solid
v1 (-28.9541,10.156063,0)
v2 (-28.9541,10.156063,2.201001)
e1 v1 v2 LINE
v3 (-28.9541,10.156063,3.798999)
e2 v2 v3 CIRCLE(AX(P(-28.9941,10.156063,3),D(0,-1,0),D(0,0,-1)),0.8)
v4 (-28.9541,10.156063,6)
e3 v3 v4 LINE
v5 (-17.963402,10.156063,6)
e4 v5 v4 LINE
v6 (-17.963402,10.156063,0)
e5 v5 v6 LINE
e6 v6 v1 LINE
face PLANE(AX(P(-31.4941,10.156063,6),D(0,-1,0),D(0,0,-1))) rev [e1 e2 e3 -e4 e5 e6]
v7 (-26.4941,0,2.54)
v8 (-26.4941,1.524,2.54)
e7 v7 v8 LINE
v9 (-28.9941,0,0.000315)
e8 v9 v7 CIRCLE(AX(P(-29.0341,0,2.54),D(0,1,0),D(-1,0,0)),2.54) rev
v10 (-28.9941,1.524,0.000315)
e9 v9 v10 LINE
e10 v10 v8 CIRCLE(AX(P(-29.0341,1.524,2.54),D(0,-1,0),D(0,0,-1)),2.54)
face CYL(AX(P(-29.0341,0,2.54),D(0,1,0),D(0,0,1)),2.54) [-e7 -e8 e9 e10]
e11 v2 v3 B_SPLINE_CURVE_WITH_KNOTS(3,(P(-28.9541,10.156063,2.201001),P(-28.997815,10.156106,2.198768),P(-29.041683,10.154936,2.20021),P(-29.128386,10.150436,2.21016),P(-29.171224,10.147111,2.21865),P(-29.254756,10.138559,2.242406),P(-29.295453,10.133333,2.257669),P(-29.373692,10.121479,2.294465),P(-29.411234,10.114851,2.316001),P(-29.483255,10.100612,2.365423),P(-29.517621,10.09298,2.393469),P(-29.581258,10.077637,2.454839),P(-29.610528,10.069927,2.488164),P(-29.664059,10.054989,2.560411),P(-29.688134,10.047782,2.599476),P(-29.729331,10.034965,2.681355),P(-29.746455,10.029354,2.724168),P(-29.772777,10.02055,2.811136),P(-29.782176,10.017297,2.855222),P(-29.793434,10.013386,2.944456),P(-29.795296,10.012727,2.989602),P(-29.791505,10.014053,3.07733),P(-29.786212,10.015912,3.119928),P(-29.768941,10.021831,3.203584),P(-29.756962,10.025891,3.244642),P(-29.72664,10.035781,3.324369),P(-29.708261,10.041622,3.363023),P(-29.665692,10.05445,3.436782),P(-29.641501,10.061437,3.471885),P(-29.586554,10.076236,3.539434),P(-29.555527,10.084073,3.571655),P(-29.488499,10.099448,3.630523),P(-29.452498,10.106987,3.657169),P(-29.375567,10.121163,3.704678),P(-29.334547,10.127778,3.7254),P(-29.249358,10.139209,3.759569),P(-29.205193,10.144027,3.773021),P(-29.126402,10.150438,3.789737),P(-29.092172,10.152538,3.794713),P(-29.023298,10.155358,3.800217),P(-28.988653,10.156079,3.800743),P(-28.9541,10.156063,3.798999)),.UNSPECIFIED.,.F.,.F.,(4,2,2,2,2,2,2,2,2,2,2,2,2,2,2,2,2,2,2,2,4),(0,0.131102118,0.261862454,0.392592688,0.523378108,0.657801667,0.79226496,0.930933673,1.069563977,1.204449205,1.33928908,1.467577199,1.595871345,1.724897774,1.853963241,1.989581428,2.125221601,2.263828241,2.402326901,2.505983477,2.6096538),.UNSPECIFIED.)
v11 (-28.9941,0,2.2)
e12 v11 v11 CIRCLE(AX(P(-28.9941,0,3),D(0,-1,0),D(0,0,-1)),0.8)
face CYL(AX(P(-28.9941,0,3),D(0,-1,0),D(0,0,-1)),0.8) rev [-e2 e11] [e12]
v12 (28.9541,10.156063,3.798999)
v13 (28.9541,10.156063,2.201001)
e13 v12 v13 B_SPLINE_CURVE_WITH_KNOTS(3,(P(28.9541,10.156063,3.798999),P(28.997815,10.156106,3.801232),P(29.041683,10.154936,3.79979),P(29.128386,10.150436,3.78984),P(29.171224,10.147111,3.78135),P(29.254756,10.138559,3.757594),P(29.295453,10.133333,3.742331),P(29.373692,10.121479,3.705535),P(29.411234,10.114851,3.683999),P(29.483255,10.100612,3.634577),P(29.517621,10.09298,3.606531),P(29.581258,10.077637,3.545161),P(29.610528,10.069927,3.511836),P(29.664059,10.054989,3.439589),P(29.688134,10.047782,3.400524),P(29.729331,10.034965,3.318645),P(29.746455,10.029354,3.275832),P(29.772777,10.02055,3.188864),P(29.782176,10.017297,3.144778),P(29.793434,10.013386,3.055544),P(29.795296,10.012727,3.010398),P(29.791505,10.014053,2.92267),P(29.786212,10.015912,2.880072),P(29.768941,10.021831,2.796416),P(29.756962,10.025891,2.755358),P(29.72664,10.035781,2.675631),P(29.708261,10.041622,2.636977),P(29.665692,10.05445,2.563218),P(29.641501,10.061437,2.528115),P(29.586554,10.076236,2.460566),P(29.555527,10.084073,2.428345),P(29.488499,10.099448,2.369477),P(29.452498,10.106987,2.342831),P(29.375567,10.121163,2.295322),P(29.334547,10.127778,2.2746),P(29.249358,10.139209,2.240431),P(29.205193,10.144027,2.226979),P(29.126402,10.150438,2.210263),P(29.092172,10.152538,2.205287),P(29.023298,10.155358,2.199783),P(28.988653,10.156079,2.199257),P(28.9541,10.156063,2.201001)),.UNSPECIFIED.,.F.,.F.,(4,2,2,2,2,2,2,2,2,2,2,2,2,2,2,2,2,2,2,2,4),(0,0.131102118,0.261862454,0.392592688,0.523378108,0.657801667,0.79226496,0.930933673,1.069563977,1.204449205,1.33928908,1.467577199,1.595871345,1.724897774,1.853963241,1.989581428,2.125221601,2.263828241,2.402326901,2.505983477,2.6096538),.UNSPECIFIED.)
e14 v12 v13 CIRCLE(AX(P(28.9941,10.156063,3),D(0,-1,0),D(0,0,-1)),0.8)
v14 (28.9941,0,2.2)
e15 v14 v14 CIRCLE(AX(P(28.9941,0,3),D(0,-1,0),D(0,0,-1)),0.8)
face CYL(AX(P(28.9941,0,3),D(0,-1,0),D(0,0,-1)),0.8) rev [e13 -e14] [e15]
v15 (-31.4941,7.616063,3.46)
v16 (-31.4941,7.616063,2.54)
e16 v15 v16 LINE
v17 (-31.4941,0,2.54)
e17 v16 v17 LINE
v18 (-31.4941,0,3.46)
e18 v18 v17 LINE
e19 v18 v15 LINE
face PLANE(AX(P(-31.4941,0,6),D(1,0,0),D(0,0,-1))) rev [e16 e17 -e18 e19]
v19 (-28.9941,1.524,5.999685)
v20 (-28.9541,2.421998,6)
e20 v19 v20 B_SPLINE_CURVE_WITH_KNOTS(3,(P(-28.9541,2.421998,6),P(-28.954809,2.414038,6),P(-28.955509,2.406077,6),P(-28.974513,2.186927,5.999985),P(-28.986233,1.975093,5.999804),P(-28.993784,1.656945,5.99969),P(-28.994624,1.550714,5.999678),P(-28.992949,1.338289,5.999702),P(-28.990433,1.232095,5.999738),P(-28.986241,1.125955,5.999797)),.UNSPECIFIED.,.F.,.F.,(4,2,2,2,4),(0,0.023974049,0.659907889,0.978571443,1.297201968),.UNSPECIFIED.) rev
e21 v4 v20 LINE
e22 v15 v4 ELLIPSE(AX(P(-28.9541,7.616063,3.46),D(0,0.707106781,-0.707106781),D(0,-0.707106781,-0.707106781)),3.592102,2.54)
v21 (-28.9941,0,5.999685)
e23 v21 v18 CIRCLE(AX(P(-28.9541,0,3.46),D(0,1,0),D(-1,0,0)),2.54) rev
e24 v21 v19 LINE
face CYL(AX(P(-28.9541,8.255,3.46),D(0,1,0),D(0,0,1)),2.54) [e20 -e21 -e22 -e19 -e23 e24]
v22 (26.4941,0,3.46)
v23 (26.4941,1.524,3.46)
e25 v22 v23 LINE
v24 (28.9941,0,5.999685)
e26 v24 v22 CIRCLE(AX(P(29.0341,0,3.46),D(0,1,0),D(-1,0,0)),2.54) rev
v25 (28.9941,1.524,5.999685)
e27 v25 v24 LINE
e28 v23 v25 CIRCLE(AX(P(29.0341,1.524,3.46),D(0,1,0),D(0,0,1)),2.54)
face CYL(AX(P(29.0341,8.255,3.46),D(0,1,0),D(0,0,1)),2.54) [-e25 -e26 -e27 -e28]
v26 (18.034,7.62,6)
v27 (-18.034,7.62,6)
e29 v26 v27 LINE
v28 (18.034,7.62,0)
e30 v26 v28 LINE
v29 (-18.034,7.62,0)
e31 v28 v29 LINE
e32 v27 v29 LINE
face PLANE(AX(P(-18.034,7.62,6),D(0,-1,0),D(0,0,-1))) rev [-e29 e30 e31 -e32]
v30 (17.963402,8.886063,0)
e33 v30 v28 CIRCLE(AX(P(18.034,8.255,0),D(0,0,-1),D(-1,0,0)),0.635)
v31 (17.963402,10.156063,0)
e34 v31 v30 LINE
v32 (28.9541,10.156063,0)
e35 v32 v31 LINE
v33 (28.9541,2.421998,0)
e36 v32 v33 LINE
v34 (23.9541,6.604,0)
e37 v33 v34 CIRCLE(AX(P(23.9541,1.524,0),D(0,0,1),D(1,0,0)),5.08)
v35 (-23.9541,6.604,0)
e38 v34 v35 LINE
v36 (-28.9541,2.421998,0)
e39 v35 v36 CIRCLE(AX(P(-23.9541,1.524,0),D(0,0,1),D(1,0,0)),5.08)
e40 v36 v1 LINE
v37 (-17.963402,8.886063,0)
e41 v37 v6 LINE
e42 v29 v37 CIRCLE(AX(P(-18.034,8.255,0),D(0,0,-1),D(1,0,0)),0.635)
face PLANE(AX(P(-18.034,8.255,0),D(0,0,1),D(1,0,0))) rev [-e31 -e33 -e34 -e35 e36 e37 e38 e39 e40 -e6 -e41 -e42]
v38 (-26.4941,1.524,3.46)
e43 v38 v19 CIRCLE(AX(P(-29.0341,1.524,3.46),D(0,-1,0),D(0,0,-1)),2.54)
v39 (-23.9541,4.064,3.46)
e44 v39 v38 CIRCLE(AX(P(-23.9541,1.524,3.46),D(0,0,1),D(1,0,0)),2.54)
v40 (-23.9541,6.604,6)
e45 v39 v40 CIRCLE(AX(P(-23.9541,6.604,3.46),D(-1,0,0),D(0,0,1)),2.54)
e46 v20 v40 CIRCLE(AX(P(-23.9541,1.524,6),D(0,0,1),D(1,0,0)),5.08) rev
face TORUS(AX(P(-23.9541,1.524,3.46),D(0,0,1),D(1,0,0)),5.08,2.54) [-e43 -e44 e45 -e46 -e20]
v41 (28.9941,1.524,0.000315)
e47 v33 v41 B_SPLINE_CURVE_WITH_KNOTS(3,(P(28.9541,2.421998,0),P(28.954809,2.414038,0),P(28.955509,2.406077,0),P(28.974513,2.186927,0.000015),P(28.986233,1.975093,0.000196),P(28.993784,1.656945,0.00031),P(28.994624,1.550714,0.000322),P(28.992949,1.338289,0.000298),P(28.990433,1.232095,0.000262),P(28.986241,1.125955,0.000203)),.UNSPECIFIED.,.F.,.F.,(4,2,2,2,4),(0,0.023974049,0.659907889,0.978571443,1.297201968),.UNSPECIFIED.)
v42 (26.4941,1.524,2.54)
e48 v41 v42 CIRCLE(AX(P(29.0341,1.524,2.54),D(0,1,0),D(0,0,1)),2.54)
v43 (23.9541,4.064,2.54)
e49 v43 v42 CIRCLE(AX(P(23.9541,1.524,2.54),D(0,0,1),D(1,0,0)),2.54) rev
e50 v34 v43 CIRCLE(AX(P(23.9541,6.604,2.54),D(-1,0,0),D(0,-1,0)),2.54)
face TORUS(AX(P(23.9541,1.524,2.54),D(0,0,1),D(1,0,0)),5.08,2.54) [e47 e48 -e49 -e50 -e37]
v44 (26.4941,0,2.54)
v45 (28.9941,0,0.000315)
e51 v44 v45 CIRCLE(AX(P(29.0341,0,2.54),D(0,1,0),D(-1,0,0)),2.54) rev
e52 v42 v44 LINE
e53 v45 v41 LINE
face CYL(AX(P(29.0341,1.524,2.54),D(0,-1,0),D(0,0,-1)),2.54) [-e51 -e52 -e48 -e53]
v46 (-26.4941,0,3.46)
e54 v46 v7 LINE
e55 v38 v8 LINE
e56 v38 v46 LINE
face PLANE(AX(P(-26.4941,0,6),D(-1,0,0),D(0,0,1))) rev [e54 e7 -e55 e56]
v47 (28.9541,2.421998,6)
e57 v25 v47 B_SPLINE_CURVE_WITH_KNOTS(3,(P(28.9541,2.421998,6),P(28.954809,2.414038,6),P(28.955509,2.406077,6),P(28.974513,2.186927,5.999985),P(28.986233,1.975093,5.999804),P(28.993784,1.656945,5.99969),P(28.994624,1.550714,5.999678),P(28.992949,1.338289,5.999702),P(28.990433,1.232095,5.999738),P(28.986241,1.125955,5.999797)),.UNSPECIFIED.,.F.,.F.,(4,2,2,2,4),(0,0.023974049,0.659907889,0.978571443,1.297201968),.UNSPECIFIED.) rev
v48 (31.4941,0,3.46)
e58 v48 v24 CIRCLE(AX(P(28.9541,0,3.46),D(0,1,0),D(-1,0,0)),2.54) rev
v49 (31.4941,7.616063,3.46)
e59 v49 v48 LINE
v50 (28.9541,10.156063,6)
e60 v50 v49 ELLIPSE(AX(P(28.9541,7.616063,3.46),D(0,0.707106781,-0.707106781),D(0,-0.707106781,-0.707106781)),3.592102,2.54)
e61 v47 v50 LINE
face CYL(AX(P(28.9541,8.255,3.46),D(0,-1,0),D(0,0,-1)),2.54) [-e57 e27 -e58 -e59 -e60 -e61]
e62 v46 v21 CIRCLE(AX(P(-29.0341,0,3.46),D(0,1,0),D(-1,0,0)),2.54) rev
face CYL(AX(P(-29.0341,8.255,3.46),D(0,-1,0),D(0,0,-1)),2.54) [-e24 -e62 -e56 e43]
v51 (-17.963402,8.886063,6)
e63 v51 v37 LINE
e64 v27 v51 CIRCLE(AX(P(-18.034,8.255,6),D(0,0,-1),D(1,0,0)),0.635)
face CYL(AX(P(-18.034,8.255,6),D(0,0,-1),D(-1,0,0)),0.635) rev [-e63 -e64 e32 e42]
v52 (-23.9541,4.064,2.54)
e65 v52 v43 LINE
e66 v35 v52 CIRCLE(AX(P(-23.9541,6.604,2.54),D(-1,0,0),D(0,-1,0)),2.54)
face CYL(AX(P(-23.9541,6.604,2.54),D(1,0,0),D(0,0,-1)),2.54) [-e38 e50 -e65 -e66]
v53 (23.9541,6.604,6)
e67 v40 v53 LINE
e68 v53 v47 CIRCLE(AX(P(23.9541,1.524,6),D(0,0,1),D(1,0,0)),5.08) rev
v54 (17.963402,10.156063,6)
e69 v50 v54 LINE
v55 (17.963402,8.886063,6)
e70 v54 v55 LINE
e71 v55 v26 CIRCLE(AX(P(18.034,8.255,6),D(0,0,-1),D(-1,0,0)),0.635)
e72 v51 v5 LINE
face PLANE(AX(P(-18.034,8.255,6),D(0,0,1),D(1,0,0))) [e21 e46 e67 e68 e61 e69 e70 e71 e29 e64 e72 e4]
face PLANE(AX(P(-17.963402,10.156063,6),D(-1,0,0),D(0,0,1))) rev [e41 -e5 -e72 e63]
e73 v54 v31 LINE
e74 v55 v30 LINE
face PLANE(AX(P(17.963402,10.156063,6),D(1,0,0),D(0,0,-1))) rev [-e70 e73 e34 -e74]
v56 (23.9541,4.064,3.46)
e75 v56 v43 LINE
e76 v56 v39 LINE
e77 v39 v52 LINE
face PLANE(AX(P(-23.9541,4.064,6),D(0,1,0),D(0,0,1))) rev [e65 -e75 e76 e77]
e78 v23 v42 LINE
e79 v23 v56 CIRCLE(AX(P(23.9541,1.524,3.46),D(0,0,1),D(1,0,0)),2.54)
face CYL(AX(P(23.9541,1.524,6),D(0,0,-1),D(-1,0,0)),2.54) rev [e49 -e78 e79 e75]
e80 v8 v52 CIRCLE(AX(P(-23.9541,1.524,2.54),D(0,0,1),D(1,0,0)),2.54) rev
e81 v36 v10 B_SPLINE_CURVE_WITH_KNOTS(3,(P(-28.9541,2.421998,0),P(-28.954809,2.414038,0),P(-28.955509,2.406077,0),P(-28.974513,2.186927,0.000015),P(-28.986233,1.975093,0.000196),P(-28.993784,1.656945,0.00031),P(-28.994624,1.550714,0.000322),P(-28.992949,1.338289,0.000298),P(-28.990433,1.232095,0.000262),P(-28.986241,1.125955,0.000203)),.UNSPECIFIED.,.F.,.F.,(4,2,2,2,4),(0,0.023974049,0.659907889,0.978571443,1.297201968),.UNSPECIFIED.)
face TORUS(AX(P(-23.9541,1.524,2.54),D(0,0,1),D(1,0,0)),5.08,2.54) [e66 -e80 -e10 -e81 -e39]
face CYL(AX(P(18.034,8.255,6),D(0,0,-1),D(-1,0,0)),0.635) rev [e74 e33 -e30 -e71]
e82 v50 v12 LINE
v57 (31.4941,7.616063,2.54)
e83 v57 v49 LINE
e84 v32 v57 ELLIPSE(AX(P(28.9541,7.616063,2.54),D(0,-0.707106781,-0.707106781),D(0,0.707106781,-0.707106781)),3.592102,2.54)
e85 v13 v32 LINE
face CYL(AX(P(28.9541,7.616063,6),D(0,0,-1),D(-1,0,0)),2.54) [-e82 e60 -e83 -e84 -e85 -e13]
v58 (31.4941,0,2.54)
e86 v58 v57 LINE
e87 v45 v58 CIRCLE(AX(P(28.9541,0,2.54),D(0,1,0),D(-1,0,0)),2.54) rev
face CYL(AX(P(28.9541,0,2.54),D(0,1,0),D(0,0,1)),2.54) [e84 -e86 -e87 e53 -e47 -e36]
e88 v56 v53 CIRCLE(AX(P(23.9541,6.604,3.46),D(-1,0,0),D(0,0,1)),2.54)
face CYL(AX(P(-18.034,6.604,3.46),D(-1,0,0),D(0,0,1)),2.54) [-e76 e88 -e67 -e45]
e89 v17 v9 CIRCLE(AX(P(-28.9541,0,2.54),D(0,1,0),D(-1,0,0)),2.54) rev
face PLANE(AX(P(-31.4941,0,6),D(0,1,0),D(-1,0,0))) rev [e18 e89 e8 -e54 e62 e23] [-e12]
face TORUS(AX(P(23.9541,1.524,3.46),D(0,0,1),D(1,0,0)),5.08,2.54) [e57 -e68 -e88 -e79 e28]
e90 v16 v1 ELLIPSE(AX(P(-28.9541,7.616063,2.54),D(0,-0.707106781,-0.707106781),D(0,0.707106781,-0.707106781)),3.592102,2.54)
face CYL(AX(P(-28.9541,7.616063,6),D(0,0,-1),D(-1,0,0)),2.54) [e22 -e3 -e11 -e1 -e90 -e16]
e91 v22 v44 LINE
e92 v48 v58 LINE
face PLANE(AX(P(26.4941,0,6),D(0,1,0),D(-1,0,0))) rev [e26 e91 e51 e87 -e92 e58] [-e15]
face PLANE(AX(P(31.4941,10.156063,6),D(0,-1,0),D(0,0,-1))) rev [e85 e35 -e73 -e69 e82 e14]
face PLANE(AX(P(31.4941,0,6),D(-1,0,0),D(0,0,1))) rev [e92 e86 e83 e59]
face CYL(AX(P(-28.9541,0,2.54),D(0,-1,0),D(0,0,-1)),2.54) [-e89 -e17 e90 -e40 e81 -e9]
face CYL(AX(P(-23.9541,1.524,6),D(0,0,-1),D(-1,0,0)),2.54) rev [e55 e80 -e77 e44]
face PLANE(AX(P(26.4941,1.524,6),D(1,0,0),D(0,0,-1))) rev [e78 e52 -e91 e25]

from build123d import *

# Parameters (mm, degrees)
BOSS_EXTRUDE1_DEPTH   = 6
M2X0_4_TAPPED_HOLE1_D = 1.6
FILLET1_R             = 2.54


with BuildPart() as part:
    # Sketch1 → Boss-Extrude1 (new body)
    with BuildSketch(Plane.XY):
        with BuildLine():
            Line((-31.4941, 0), (-26.4941, 0))
            Line((-26.4941, 0), (-26.4941, 1.524))
            ThreePointArc((-26.4941, 1.524), (-25.750151224, 3.320051224), (-23.9541, 4.064))
            Line((-23.9541, 4.064), (23.9541, 4.064))
            ThreePointArc((23.9541, 4.064), (25.750151224, 3.320051224), (26.4941, 1.524))
            Line((26.4941, 1.524), (26.4941, 0))
            Line((26.4941, 0), (31.4941, 0))
            Line((31.4941, 0), (31.4941, 10.156063356))
            Line((31.4941, 10.156063356), (17.963402264, 10.156063356))
            Line((17.963402264, 10.156063356), (17.963402264, 8.886063356))
            ThreePointArc((17.963402264, 8.886063356), (18.668015075, 8.290353704), (18.034, 7.62))
            Line((18.034, 7.62), (-18.034, 7.62))
            ThreePointArc((-18.034, 7.62), (-18.668015075, 8.290353704), (-17.963402264, 8.886063356))
            Line((-17.963402264, 8.886063356), (-17.963402264, 10.156063356))
            Line((-17.963402264, 10.156063356), (-31.4941, 10.156063356))
            Line((-31.4941, 10.156063356), (-31.4941, 0))
        make_face()
    extrude(amount=BOSS_EXTRUDE1_DEPTH)

    # M2x0.4 Tapped Hole1 (through all)
    with Locations(Plane(origin=(0, 0, 0), x_dir=(-1, 0, 0), z_dir=(0, -1, 0))):
        with Locations((28.9941, -3), (-28.9941, -3)):
            Hole(M2X0_4_TAPPED_HOLE1_D / 2)

    # Fillet1
    # the kernel refuses this fillet: 2.54 mm, written as the material it takes off along each edge
    with BuildSketch(Plane(origin=(-26.4941, -6.35, 0), x_dir=(-1, 0, 0), z_dir=(0, 1, 0)), Plane(origin=(26.4941, 1.524, 0), x_dir=(1, 0, 0), z_dir=(0, -1, 0))) as fillet1_piece_1:
        with BuildLine():
            CenterArc((FILLET1_R, FILLET1_R), FILLET1_R, 180, 90)
            Line((0, FILLET1_R), (0, 0))
            Line((0, 0), (FILLET1_R, 0))
        make_face()
    extrude(amount=7.874, mode=Mode.SUBTRACT)
    with BuildSketch(Plane(origin=(-23.9541, 1.524, 0), x_dir=(-1, 0, 0), z_dir=(0, -1, 0))) as fillet1_piece_2:
        with BuildLine():
            CenterArc((2.54 + FILLET1_R, -FILLET1_R), FILLET1_R, 90, 90)
            Line((2.54, -FILLET1_R), (2.54, 0))
            Line((2.54, 0), (2.54 + FILLET1_R, 0))
        make_face()
    revolve(axis=Axis((-23.9541, 1.524, 0), (0, 0, -1)), revolution_arc=90, mode=Mode.SUBTRACT)
    with BuildSketch(Plane(origin=(23.9541, 1.524, 0), x_dir=(0, 1, 0), z_dir=(-1, 0, 0))) as fillet1_piece_3:
        with BuildLine():
            CenterArc((2.54 + FILLET1_R, -FILLET1_R), FILLET1_R, 90, 90)
            Line((2.54, -FILLET1_R), (2.54, 0))
            Line((2.54, 0), (2.54 + FILLET1_R, 0))
        make_face()
    revolve(axis=Axis((23.9541, 1.524, 0), (0, 0, -1)), revolution_arc=90, mode=Mode.SUBTRACT)
    with BuildSketch(Plane(origin=(-26.4941, -6.35, 6), x_dir=(-1, 0, 0), z_dir=(0, 1, 0)), Plane(origin=(26.4941, 1.524, 6), x_dir=(1, 0, 0), z_dir=(0, -1, 0))) as fillet1_piece_4:
        with BuildLine():
            CenterArc((FILLET1_R, -FILLET1_R), FILLET1_R, 90, 90)
            Line((0, -FILLET1_R), (0, 0))
            Line((0, 0), (FILLET1_R, 0))
        make_face()
    extrude(amount=7.874, mode=Mode.SUBTRACT)
    with BuildSketch(Plane(origin=(-23.9541, 1.524, 6), x_dir=(-1, 0, 0), z_dir=(0, -1, 0))) as fillet1_piece_5:
        with BuildLine():
            CenterArc((2.54 + FILLET1_R, FILLET1_R), FILLET1_R, 180, 90)
            Line((2.54, FILLET1_R), (2.54, 0))
            Line((2.54, 0), (2.54 + FILLET1_R, 0))
        make_face()
    revolve(axis=Axis((-23.9541, 1.524, 6), (0, 0, -1)), revolution_arc=90, mode=Mode.SUBTRACT)
    with BuildSketch(Plane(origin=(-23.9541, 4.064, 6), x_dir=(0, 1, 0), z_dir=(1, 0, 0))) as fillet1_piece_6:
        with BuildLine():
            CenterArc((FILLET1_R, -FILLET1_R), FILLET1_R, 90, 90)
            Line((0, -FILLET1_R), (0, 0))
            Line((0, 0), (FILLET1_R, 0))
        make_face()
    extrude(amount=47.9082, mode=Mode.SUBTRACT)
    with BuildSketch(Plane(origin=(23.9541, 1.524, 6), x_dir=(0, 1, 0), z_dir=(-1, 0, 0))) as fillet1_piece_7:
        with BuildLine():
            CenterArc((2.54 + FILLET1_R, FILLET1_R), FILLET1_R, 180, 90)
            Line((2.54, FILLET1_R), (2.54, 0))
            Line((2.54, 0), (2.54 + FILLET1_R, 0))
        make_face()
    revolve(axis=Axis((23.9541, 1.524, 6), (0, 0, -1)), revolution_arc=90, mode=Mode.SUBTRACT)
    with BuildSketch(Plane(origin=(-31.4941, 16.506063356, 0), x_dir=(1, 0, 0), z_dir=(0, -1, 0)), Plane(origin=(31.4941, -6.35, 0), x_dir=(-1, 0, 0), z_dir=(0, 1, 0))) as fillet1_piece_8:
        with BuildLine():
            CenterArc((FILLET1_R, FILLET1_R), FILLET1_R, 180, 90)
            Line((0, FILLET1_R), (0, 0))
            Line((0, 0), (FILLET1_R, 0))
        make_face()
    extrude(amount=22.856063356, mode=Mode.SUBTRACT)
    with BuildSketch(Plane(origin=(-31.4941, 16.506063356, 6), x_dir=(1, 0, 0), z_dir=(0, -1, 0)), Plane(origin=(31.4941, -6.35, 6), x_dir=(-1, 0, 0), z_dir=(0, 1, 0))) as fillet1_piece_9:
        with BuildLine():
            CenterArc((FILLET1_R, -FILLET1_R), FILLET1_R, 90, 90)
            Line((0, -FILLET1_R), (0, 0))
            Line((0, 0), (FILLET1_R, 0))
        make_face()
    extrude(amount=22.856063356, mode=Mode.SUBTRACT)
    with BuildSketch(Plane(origin=(-23.9541, 4.064, 0), x_dir=(0, 1, 0), z_dir=(1, 0, 0))) as fillet1_piece_10:
        with BuildLine():
            CenterArc((FILLET1_R, FILLET1_R), FILLET1_R, 180, 90)
            Line((0, FILLET1_R), (0, 0))
            Line((0, 0), (FILLET1_R, 0))
        make_face()
    extrude(amount=47.9082, mode=Mode.SUBTRACT)
    with BuildSketch(Plane(origin=(31.4941, 10.156063356, -6.35), x_dir=(0, -1, 0), z_dir=(0, 0, 1)), Plane(origin=(-31.4941, 10.156063356, -6.35), x_dir=(1, 0, 0), z_dir=(0, 0, 1))) as fillet1_piece_11:
        with BuildLine():
            CenterArc((FILLET1_R, -FILLET1_R), FILLET1_R, 90, 90)
            Line((0, -FILLET1_R), (0, 0))
            Line((0, 0), (FILLET1_R, 0))
        make_face()
    extrude(amount=18.7, mode=Mode.SUBTRACT)


solid = part.part
